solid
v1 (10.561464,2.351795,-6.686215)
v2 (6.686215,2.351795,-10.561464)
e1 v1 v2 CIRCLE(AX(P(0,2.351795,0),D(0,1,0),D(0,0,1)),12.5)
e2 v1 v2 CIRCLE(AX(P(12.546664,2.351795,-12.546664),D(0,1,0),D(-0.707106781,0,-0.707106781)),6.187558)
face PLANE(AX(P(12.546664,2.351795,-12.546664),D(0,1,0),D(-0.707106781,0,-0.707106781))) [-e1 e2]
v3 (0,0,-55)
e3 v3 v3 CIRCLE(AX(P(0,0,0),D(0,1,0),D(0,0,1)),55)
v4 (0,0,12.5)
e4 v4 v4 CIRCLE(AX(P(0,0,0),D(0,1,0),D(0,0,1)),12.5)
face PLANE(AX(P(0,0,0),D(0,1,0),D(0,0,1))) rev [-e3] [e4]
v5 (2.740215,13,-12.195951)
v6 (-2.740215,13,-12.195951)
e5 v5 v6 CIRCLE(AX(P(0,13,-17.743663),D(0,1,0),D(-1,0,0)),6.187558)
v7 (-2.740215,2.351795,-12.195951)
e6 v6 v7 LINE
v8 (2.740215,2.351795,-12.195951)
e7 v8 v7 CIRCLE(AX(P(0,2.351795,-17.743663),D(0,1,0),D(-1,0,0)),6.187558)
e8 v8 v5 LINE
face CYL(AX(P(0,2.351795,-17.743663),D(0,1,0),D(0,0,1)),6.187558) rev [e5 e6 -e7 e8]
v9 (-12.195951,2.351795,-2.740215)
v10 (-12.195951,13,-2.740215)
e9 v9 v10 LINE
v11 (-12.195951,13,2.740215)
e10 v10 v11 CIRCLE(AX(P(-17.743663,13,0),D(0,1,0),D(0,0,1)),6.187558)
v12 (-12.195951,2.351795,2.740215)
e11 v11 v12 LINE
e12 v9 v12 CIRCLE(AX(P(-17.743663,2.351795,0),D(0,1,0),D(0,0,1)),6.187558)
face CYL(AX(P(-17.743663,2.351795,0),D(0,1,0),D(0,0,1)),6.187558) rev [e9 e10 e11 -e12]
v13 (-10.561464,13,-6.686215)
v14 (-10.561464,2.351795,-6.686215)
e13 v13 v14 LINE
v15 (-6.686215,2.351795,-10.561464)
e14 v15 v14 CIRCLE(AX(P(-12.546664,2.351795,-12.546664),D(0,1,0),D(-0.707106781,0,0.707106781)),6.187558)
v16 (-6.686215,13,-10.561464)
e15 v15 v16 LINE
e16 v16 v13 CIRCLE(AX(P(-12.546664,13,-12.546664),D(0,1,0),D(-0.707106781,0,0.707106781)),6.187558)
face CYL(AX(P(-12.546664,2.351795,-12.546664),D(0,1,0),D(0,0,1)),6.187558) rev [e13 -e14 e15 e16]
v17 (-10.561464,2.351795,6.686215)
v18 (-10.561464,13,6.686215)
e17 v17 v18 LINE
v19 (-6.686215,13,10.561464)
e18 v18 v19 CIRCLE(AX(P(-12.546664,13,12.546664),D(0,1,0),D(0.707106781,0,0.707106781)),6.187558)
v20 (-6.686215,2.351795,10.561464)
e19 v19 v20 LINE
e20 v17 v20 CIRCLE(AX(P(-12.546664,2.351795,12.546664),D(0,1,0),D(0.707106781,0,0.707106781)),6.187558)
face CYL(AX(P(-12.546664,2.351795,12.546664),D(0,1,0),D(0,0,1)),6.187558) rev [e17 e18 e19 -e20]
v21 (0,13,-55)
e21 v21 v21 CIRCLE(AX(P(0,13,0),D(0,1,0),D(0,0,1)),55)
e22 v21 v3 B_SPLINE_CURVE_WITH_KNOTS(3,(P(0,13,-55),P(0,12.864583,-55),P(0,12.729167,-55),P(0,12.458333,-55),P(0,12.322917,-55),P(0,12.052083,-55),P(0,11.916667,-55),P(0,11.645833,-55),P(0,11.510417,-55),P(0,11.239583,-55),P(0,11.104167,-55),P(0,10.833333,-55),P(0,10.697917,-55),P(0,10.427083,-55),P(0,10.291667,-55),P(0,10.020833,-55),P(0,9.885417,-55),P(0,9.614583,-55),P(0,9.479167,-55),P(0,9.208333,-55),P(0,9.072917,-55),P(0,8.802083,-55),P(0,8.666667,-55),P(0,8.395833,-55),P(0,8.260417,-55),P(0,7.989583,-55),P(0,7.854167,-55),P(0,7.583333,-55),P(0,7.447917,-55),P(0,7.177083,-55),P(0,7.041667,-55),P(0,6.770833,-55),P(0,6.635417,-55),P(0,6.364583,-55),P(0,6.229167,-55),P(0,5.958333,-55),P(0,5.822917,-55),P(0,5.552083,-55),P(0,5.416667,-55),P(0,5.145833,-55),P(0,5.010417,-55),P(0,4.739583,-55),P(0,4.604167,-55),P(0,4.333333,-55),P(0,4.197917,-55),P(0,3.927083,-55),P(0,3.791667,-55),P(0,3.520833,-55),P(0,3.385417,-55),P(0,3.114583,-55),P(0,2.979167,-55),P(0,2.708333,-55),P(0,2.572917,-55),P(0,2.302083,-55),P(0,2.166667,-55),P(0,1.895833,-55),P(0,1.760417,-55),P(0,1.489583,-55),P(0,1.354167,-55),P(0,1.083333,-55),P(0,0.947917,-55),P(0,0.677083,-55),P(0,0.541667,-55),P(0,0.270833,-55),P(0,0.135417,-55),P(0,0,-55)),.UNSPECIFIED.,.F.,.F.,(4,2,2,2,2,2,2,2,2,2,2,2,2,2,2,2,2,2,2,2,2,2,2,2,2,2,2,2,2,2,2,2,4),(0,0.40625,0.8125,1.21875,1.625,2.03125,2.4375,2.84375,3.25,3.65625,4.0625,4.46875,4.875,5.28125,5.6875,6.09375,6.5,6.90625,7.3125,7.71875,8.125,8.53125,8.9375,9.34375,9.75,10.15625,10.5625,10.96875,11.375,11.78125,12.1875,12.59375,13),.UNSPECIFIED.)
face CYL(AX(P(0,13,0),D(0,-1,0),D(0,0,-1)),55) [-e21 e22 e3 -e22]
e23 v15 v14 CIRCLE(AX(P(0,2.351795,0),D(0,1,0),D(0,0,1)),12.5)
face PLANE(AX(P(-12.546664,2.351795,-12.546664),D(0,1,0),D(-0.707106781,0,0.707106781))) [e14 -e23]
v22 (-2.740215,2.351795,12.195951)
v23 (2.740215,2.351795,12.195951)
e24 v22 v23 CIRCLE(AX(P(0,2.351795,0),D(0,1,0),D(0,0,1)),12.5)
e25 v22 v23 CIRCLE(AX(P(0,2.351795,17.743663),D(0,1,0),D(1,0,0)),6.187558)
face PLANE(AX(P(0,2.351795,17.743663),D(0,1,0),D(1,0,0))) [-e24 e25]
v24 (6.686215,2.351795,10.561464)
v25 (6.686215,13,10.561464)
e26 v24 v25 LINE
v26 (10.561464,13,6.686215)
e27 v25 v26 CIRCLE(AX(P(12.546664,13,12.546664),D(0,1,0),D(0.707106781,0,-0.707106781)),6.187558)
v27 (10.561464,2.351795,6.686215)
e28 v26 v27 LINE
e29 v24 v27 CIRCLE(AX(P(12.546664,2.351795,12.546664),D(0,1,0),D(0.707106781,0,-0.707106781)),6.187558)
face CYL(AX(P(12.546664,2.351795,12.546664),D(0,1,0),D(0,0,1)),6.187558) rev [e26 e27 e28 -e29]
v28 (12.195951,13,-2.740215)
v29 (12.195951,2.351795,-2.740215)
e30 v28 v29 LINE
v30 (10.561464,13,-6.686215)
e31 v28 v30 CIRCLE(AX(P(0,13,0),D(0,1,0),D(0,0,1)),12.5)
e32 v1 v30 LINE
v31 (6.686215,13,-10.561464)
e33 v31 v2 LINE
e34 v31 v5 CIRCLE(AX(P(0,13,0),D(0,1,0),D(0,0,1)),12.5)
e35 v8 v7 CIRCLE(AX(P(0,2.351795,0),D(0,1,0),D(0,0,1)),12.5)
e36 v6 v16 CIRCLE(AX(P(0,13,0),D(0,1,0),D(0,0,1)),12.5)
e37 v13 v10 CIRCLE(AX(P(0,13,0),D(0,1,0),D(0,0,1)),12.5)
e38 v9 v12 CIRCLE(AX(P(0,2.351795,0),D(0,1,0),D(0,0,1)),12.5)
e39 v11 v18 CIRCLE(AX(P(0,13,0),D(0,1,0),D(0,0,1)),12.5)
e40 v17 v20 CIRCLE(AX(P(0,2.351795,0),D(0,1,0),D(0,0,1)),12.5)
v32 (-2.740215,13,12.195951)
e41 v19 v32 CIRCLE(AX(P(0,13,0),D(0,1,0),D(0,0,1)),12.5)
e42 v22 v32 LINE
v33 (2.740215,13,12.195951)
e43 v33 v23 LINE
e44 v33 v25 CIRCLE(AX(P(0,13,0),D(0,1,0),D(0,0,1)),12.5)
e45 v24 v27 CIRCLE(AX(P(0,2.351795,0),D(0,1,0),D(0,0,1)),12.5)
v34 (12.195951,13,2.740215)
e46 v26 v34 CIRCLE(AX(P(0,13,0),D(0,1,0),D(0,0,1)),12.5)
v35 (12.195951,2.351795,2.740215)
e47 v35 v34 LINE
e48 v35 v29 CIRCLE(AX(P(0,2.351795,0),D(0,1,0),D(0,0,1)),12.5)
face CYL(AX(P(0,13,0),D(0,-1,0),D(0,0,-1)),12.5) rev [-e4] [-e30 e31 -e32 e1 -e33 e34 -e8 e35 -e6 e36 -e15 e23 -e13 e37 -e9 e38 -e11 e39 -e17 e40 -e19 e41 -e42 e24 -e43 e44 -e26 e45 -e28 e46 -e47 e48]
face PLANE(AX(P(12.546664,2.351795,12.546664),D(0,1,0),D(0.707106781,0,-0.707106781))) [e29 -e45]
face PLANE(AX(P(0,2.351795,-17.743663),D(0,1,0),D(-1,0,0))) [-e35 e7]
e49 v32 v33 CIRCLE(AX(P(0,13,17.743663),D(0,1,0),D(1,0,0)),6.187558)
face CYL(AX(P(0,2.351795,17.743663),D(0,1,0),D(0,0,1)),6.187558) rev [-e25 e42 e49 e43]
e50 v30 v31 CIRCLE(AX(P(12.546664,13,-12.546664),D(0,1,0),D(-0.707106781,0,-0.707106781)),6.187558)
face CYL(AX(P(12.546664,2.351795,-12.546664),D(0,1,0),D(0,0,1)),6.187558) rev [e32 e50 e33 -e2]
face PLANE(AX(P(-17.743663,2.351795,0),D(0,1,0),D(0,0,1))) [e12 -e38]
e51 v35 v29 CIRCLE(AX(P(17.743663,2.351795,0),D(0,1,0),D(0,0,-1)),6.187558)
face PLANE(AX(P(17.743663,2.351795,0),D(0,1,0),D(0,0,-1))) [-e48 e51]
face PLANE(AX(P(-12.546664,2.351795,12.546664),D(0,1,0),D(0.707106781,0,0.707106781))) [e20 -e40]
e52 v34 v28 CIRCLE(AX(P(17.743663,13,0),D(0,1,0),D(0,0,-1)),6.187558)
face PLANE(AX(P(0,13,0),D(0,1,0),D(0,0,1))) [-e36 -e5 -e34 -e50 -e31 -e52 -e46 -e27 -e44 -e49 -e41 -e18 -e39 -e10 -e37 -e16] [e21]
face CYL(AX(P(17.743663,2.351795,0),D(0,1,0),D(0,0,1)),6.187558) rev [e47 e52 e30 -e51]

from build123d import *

# Parameters (mm, degrees)
SKETCH1_R           = 55
BOSS_EXTRUDE1_DEPTH = 13
SKETCH2_R           = 12.5
CUT_EXTRUDE1_DEPTH  = 79.860636569
SKETCH3_R           = 6.187558348
CUT_EXTRUDE2_DEPTH  = 10.648204591
CIRPATTERN1_COUNT   = 8


with BuildPart() as part:
    # Sketch1 → Boss-Extrude1 (new body)
    with BuildSketch(Plane(origin=(0, 0, 0), x_dir=(1, 0, 0), z_dir=(0, 1, 0))):
        Circle(SKETCH1_R)
    extrude(amount=BOSS_EXTRUDE1_DEPTH)

    # Sketch2 → Cut-Extrude1 (cut, through all)
    with BuildSketch(Plane(origin=(0, 0, 0), x_dir=(1, 0, 0), z_dir=(0, 1, 0))):
        Circle(SKETCH2_R)
    extrude(amount=CUT_EXTRUDE1_DEPTH, mode=Mode.SUBTRACT)

    # Sketch3 → Cut-Extrude2 (cut)
    with BuildSketch(Plane(origin=(0, 13, 0), x_dir=(1, 0, 0), z_dir=(0, 1, 0))):
        with Locations((-17.7436626, 0)):
            Circle(SKETCH3_R)
    cut_extrude2 = extrude(amount=-CUT_EXTRUDE2_DEPTH, mode=Mode.SUBTRACT)

    # CirPattern1: Cut-Extrude2 ×8 about axis
    cirpattern1_axis = Axis((0, 0, 0), (0, 1, 0))
    for i in range(1, CIRPATTERN1_COUNT):
        add(cut_extrude2.rotate(cirpattern1_axis, i * 360 / CIRPATTERN1_COUNT), mode=Mode.SUBTRACT)


solid = part.part
